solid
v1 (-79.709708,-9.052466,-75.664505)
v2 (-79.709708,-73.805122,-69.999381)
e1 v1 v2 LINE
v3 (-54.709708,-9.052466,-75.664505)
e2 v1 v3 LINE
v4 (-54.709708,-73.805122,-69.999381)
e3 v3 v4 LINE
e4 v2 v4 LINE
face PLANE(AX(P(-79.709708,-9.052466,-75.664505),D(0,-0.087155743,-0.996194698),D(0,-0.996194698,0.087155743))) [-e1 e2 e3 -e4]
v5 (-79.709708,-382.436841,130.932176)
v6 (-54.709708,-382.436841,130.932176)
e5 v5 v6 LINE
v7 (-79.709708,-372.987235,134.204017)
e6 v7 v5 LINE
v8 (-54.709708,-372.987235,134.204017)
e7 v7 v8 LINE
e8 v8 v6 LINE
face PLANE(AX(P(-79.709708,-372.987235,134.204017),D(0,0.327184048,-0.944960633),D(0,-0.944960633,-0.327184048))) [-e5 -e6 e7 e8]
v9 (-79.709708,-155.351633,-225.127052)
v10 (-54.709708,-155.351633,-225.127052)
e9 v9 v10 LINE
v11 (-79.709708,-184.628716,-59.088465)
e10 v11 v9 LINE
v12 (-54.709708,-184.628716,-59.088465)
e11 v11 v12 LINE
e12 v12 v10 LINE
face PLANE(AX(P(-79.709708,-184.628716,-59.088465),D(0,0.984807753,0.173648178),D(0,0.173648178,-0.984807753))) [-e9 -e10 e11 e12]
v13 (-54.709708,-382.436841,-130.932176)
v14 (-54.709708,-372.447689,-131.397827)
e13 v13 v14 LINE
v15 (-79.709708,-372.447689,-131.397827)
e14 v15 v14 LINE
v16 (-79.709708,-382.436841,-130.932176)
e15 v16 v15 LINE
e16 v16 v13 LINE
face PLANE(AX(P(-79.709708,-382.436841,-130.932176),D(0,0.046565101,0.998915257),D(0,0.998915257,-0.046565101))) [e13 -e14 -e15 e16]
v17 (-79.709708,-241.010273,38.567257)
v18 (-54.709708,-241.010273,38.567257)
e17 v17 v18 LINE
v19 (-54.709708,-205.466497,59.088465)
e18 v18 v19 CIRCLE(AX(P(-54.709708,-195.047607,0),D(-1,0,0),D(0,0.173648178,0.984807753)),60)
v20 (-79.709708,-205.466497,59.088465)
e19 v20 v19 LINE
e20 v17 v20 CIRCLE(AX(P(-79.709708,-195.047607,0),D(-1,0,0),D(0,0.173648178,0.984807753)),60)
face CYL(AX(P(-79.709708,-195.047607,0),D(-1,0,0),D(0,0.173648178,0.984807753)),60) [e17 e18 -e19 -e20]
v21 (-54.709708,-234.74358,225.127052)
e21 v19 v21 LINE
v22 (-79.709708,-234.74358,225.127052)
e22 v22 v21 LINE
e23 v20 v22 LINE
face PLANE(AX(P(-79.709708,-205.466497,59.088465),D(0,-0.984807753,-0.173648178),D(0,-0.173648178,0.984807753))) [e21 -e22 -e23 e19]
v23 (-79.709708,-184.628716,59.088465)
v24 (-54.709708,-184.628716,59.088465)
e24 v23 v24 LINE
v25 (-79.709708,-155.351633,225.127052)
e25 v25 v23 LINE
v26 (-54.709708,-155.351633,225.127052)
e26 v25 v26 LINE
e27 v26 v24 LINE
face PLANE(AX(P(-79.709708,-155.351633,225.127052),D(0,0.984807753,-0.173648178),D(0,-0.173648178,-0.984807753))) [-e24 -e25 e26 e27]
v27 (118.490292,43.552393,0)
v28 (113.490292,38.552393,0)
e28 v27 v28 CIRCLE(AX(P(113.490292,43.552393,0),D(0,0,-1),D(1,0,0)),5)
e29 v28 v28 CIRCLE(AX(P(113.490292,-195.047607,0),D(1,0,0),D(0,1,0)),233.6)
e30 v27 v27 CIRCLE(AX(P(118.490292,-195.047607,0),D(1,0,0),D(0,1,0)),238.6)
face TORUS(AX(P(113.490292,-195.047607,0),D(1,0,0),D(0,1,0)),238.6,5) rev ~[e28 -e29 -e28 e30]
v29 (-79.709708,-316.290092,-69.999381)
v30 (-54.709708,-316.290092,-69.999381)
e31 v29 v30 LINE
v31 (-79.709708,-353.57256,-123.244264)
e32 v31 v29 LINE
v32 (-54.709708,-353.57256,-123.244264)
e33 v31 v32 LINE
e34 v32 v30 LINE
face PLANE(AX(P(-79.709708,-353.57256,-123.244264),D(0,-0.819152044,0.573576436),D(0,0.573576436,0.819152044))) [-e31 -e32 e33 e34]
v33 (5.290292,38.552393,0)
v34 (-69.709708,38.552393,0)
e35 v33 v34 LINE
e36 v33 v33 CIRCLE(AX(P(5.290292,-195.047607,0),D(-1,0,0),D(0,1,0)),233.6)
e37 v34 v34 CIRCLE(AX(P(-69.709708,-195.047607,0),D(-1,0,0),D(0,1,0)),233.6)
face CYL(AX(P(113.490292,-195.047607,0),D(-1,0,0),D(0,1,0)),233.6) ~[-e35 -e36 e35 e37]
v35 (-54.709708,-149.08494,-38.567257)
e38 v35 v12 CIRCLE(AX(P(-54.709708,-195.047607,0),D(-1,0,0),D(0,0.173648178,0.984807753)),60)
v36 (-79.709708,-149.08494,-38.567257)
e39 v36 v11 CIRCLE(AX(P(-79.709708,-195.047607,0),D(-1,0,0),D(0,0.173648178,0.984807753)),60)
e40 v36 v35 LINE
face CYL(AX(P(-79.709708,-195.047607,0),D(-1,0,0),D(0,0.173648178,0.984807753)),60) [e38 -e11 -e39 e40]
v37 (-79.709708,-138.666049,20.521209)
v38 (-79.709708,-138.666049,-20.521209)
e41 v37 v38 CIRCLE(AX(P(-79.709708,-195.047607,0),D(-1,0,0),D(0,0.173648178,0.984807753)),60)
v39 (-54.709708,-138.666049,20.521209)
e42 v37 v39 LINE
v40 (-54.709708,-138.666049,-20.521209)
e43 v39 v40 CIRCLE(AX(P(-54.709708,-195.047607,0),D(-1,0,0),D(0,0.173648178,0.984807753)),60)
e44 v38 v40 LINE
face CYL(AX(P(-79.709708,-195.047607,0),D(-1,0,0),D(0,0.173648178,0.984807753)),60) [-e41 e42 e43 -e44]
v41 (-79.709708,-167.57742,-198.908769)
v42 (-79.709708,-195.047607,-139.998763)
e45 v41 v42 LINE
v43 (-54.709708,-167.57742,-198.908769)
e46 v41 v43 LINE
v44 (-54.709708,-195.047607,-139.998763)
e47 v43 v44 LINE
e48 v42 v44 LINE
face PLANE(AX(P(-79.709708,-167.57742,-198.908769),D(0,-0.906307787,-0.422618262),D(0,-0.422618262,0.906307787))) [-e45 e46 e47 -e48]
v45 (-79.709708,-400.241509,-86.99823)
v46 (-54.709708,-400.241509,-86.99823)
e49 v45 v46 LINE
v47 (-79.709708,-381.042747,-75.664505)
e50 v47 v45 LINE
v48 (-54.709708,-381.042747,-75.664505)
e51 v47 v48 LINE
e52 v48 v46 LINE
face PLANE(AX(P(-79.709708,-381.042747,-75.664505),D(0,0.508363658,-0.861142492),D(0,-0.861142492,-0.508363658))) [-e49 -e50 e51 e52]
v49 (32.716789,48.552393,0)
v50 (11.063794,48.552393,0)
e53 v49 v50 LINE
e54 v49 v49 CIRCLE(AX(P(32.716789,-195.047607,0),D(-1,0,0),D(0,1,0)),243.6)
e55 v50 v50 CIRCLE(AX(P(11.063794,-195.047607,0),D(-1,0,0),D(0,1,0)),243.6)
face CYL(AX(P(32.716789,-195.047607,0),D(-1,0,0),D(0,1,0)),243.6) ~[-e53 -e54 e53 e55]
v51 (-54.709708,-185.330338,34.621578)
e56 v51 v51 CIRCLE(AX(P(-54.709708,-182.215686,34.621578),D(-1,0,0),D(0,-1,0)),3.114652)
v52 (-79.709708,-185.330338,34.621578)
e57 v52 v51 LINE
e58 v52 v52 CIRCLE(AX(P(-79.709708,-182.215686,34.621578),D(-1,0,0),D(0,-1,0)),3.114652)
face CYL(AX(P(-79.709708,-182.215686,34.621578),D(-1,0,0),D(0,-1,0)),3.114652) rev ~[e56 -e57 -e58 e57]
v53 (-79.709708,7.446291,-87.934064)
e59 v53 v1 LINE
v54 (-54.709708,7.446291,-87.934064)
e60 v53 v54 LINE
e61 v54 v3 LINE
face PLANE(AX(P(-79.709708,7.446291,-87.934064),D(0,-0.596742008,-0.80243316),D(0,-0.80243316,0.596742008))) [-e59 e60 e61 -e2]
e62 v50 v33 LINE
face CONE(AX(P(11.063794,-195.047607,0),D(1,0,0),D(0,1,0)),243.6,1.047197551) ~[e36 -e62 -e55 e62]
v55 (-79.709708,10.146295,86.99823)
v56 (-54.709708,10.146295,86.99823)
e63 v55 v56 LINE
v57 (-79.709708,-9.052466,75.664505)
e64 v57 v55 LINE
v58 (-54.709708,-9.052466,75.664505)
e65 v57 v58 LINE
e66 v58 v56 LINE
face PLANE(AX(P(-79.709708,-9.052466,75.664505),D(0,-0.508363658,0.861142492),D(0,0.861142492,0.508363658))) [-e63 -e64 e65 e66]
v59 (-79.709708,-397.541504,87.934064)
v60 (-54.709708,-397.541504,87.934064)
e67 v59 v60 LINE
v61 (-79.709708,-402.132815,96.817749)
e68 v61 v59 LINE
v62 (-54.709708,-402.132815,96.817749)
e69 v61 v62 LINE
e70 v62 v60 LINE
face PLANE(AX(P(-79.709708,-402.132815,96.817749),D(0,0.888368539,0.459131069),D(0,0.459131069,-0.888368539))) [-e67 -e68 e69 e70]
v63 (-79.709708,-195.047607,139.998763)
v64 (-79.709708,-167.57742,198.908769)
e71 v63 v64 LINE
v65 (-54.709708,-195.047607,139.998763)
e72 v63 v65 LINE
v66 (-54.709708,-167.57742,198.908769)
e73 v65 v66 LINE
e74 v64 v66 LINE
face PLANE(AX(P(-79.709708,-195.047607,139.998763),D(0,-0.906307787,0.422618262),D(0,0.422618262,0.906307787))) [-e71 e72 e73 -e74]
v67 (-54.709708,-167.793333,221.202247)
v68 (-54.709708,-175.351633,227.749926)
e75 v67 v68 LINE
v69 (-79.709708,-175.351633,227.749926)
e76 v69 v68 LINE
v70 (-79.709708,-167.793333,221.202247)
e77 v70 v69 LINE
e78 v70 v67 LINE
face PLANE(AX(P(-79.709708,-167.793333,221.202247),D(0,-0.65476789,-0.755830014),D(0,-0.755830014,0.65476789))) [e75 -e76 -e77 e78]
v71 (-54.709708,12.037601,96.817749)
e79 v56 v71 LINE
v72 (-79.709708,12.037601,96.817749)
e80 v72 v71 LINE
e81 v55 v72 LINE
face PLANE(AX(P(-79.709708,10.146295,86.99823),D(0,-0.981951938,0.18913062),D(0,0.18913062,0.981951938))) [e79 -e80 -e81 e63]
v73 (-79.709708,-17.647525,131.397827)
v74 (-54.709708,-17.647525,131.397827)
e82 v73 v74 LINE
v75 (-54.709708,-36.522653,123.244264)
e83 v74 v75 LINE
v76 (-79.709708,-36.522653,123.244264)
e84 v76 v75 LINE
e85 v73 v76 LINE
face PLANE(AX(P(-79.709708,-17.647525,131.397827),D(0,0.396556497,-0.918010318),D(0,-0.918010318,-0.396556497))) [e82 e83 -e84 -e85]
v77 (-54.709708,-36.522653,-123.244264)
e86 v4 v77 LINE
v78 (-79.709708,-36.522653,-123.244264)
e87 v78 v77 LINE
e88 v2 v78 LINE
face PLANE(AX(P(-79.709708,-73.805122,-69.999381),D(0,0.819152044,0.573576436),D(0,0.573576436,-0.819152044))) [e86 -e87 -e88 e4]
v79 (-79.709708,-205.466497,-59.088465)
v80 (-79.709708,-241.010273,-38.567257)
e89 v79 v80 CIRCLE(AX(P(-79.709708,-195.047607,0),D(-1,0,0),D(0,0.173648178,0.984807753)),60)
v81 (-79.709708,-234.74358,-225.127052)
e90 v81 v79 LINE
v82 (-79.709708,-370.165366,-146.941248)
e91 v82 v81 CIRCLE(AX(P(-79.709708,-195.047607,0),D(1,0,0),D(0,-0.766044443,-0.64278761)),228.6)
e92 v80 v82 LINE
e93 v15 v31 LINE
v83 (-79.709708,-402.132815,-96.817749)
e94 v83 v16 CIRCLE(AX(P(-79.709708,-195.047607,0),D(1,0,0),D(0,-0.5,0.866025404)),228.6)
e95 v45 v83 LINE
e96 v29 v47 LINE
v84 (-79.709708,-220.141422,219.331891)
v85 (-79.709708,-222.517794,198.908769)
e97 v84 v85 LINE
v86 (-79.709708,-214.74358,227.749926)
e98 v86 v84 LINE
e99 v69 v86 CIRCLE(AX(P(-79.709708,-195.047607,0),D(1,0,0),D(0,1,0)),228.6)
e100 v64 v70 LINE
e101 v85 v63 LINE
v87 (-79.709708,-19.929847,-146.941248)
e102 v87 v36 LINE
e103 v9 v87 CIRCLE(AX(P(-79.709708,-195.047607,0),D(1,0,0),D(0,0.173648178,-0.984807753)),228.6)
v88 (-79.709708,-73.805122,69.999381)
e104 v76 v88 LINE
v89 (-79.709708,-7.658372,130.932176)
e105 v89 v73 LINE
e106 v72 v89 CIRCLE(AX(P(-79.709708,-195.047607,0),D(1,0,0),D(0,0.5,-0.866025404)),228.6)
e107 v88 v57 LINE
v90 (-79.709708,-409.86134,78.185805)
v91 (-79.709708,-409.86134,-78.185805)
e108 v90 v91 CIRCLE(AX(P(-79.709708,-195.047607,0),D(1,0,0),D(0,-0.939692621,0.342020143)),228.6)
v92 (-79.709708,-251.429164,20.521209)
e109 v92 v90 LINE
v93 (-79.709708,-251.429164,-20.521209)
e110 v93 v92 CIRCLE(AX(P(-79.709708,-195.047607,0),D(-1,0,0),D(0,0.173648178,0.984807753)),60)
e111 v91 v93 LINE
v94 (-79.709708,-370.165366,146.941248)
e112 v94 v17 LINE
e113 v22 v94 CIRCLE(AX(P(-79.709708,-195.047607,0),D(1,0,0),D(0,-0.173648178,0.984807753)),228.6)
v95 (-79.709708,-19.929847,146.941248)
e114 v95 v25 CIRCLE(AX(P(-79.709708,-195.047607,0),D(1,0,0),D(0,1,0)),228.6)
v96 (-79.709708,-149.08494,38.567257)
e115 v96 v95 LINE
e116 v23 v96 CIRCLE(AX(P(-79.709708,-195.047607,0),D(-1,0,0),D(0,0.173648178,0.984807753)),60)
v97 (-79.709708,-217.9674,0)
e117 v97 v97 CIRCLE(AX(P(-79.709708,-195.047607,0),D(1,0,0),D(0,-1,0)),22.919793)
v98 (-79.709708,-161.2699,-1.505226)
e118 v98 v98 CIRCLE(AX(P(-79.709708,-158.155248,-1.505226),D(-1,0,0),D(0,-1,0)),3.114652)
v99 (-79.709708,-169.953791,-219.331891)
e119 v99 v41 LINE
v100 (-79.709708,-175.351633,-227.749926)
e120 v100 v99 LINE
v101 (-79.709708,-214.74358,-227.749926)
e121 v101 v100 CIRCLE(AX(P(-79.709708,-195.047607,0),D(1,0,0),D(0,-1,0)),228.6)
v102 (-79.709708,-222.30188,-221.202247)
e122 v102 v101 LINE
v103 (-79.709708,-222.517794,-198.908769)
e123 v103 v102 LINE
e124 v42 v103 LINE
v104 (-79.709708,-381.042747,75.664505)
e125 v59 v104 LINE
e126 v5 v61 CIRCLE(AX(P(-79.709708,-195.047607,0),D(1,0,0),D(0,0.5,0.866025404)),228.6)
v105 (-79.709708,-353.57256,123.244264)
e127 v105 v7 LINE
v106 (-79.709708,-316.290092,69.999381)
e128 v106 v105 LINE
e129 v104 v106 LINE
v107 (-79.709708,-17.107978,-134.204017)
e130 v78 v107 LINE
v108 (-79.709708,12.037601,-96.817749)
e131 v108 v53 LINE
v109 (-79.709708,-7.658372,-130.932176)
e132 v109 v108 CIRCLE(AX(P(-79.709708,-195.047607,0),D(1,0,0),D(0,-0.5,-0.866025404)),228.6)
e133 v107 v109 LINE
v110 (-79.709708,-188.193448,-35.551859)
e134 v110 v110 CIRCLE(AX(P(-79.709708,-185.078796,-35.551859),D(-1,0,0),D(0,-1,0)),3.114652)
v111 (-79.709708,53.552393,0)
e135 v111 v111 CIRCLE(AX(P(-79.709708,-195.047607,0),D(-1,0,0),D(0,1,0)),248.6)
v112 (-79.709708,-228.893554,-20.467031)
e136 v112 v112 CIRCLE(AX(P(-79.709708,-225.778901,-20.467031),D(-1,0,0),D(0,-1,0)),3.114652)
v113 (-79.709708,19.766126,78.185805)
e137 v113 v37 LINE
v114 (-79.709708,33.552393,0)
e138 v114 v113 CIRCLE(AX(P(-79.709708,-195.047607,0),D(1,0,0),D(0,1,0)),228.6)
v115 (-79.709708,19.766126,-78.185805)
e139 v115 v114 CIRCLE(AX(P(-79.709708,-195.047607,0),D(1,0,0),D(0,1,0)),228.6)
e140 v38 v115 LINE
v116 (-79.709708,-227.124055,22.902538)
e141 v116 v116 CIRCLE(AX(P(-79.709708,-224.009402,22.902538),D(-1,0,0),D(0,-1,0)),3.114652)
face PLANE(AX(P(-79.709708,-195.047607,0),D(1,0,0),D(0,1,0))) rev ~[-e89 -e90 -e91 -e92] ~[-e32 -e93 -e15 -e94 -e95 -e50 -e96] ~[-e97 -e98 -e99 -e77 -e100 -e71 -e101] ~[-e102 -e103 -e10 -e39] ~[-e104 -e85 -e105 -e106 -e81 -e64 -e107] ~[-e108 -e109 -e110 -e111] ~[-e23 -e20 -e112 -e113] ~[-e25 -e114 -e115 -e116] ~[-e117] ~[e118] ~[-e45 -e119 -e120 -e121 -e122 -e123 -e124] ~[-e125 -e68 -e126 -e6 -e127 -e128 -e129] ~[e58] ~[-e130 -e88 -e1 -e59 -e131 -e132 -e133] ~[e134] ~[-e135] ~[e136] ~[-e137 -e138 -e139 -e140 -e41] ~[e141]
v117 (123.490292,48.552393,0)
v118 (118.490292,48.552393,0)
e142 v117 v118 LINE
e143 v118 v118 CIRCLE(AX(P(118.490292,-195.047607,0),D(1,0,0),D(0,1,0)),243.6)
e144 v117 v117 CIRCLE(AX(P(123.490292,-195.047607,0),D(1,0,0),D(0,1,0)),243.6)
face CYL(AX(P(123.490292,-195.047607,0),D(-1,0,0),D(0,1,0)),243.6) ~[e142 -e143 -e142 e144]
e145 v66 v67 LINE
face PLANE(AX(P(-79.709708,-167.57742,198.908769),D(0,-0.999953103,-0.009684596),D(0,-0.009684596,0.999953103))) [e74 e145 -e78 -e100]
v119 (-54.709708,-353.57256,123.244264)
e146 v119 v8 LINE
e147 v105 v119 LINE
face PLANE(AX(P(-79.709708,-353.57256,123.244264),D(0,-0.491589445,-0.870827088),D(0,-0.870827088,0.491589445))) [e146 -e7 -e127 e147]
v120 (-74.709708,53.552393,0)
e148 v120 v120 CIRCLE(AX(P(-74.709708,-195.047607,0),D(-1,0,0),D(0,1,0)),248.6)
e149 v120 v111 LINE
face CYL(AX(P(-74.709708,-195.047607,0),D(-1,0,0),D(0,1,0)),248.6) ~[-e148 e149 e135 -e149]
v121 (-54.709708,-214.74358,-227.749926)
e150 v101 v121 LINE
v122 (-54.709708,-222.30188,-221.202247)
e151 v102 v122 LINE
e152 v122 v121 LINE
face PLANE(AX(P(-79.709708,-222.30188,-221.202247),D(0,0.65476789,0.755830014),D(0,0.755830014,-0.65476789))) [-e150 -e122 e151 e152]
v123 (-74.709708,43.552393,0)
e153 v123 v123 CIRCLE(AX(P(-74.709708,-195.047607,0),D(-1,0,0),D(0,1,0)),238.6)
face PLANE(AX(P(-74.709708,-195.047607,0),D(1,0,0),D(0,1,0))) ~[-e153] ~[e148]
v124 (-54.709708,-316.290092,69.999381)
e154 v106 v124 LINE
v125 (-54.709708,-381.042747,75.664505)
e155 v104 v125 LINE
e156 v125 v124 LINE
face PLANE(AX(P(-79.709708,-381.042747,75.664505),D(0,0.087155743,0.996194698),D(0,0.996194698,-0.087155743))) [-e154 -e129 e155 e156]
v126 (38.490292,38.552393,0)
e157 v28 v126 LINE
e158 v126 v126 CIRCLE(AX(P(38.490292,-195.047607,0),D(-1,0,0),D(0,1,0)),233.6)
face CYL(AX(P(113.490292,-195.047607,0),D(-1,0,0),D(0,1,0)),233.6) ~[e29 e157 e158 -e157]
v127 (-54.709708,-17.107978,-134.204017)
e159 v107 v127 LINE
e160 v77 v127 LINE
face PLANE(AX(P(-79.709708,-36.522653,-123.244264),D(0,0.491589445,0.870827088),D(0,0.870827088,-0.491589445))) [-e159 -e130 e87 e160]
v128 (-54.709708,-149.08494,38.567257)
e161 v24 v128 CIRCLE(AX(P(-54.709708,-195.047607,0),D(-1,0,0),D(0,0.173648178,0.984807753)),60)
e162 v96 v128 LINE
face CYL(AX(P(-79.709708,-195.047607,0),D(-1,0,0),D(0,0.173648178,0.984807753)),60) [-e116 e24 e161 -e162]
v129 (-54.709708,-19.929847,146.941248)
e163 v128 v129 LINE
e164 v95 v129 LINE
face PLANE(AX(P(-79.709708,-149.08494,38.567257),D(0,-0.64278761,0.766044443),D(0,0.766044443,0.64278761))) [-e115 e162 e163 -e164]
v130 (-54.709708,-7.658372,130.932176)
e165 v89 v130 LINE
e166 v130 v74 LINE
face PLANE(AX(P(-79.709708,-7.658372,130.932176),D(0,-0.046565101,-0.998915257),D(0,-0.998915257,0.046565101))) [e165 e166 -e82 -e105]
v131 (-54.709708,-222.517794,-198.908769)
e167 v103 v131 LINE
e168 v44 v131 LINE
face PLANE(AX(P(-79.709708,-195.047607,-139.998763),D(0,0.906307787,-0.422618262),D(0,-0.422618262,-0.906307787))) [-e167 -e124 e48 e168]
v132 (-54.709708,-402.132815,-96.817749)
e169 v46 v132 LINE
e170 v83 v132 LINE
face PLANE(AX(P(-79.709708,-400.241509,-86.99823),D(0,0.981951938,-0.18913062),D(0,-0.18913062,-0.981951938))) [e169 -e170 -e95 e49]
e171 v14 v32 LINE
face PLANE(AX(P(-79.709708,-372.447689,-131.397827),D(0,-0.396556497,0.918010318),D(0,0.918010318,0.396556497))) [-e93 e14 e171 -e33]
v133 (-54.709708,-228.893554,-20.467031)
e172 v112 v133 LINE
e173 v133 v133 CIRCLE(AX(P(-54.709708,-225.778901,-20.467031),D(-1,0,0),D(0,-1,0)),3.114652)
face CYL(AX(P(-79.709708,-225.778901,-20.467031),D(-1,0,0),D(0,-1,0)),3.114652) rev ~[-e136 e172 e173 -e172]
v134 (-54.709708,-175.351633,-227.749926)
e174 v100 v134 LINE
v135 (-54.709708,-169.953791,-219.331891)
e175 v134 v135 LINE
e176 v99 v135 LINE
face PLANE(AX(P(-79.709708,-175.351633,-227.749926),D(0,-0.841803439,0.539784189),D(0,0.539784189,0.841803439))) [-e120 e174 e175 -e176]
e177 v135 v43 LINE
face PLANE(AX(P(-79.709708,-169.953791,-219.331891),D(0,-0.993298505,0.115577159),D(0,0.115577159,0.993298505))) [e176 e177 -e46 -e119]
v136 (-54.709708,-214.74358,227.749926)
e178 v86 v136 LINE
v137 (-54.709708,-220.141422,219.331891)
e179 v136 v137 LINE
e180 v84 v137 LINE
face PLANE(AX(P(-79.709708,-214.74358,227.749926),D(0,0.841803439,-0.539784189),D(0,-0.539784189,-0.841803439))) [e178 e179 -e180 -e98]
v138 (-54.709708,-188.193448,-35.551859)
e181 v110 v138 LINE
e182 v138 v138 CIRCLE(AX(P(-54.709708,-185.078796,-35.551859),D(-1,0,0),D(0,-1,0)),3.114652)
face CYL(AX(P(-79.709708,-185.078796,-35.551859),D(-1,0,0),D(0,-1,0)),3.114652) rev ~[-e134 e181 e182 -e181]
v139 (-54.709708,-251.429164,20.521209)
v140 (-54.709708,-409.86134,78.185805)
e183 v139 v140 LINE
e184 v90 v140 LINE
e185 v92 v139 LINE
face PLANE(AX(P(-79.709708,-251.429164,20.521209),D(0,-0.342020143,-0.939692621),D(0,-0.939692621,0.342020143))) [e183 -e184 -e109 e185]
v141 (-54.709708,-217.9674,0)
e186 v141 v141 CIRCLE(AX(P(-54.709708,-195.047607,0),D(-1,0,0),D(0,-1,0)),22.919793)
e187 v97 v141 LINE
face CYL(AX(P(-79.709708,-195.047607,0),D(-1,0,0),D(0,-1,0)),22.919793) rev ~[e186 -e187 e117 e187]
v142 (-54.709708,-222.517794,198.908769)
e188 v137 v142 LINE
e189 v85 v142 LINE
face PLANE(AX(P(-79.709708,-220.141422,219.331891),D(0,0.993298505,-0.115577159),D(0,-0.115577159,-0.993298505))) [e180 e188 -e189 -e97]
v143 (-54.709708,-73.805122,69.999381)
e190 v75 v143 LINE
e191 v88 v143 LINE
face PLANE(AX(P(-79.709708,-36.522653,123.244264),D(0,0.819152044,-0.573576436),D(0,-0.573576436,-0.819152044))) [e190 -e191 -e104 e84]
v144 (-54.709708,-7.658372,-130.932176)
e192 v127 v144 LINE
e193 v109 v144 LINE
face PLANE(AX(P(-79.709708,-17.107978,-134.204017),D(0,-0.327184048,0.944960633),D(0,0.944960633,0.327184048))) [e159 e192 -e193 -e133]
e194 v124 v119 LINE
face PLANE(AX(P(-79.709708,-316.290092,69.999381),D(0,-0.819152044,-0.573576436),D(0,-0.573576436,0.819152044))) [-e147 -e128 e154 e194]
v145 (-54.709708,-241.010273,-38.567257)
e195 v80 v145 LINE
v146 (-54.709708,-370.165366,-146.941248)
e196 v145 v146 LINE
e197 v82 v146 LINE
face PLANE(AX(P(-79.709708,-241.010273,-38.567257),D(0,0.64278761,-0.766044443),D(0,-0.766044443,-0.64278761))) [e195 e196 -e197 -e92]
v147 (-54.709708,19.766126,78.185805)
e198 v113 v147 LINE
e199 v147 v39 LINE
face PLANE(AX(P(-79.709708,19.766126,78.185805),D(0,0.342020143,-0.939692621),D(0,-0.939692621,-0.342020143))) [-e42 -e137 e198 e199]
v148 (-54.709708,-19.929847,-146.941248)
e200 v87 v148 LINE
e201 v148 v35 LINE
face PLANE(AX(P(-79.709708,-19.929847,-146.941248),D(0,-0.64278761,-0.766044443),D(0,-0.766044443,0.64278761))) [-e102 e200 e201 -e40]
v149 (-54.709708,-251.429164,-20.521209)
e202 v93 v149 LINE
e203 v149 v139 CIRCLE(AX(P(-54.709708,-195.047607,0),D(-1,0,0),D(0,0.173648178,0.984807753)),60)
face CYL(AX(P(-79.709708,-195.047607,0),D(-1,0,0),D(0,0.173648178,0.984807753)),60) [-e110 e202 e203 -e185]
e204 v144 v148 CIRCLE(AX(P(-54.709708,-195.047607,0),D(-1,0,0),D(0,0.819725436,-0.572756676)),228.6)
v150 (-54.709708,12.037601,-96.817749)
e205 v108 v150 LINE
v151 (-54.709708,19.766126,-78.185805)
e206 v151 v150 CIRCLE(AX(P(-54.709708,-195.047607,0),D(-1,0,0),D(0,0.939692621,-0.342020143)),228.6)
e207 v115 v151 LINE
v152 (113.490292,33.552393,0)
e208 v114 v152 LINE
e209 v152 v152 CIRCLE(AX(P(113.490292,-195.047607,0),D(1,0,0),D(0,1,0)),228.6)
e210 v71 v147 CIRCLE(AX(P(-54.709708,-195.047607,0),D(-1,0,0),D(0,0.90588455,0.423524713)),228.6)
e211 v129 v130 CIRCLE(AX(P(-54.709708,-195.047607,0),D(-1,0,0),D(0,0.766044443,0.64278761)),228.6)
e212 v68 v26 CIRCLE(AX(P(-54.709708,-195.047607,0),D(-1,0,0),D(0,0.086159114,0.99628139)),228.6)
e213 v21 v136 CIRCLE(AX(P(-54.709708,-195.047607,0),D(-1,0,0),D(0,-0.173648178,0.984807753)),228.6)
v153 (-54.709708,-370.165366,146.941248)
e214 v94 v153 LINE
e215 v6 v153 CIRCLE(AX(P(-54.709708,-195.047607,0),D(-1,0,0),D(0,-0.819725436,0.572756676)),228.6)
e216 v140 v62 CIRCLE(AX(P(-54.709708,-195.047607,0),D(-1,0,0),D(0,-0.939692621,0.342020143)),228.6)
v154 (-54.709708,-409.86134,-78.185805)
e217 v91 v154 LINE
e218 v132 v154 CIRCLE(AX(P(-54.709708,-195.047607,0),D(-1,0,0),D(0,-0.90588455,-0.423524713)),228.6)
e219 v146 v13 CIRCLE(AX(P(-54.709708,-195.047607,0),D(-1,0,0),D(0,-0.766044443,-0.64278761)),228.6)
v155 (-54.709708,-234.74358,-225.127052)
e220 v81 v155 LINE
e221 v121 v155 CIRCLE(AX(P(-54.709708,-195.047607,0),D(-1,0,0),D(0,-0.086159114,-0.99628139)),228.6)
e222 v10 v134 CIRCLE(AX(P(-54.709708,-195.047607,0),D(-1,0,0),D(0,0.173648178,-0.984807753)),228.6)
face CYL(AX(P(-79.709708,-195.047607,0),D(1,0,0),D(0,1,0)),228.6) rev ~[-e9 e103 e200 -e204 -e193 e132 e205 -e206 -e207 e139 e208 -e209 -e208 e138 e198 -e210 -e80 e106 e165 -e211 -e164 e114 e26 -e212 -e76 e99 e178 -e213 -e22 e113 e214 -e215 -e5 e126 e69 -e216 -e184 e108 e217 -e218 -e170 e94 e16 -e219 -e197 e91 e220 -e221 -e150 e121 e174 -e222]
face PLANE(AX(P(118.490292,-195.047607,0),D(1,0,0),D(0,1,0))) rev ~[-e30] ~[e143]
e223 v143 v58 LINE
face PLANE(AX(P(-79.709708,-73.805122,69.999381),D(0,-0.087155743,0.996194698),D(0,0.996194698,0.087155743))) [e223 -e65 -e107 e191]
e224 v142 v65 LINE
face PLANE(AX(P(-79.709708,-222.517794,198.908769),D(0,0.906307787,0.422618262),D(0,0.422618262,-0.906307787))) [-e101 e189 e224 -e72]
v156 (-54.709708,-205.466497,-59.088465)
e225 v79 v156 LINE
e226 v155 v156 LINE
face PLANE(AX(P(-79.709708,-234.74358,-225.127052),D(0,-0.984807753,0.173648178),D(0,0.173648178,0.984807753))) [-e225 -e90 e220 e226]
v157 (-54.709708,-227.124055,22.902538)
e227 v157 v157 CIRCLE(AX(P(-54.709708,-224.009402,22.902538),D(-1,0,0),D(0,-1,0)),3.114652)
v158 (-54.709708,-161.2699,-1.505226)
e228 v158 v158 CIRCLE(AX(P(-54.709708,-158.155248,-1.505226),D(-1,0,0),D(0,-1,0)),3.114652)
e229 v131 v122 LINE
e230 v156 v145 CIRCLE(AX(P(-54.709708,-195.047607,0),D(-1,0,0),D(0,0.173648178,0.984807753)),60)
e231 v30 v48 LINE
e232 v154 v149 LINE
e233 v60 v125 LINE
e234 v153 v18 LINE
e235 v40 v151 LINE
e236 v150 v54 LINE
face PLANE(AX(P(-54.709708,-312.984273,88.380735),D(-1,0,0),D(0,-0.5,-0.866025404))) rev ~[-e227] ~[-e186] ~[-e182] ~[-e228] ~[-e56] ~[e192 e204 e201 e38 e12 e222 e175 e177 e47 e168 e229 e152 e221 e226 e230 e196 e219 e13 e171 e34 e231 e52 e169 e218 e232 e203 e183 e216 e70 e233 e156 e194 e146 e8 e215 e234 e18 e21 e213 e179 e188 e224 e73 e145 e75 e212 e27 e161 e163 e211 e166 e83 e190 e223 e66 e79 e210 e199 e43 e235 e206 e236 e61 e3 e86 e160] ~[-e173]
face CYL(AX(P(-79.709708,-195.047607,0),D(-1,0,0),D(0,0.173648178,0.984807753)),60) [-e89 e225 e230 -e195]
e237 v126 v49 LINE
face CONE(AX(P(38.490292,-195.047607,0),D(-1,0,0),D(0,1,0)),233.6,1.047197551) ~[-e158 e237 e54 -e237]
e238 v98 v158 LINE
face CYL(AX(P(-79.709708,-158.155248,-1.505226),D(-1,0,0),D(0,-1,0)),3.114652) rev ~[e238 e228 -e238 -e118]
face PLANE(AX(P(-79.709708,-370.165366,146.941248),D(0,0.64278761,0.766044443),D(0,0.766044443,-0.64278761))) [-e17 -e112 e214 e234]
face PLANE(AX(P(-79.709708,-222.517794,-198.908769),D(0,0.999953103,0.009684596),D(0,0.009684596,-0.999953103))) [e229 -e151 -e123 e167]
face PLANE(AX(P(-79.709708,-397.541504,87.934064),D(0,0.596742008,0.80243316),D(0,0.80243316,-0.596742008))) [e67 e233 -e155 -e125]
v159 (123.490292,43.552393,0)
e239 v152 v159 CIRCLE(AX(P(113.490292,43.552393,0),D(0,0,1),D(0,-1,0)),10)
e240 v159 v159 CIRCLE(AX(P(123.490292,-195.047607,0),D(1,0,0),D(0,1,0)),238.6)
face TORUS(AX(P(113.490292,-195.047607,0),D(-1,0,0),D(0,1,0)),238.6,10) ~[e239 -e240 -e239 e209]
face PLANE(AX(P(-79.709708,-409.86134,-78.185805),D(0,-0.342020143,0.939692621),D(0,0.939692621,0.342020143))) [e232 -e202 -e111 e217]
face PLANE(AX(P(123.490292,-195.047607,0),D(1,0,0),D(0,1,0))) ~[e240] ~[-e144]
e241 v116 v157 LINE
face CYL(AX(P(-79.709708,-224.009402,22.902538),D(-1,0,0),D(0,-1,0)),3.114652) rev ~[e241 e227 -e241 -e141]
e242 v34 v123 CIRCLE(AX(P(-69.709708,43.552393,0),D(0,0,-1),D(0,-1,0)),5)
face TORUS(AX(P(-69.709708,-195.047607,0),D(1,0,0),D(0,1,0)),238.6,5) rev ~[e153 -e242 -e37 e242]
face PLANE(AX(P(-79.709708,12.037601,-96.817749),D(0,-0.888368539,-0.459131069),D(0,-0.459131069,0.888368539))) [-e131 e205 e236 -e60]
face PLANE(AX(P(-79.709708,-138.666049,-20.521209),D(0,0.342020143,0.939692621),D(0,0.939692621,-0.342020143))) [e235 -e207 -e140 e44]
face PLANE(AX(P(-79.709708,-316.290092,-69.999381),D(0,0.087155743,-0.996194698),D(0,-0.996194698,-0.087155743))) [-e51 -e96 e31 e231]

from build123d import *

# Parameters (mm, degrees)
F2_R     = 3.1146523594
F2_R_2   = 22.9197931693
F3_DEPTH = 25
F4_COUNT = 6
F5_DEPTH = 25


# Not quite as in the source:
# - a feature names something its author has since deleted; it is built from what else it names


with BuildPart() as f1:
    # F0 (on Top) → F1 (revolve)
    with BuildSketch(Plane.XY):
        with BuildLine():
            Line((-79.7097083151, 53.5523933172), (-79.7097083151, 33.5523933172))
            Line((-79.7097083151, 33.5523933172), (113.4902916849, 33.5523933172))
            ThreePointArc((113.4902916849, 33.5523933172), (120.5613594967, 36.4813255054), (123.4902916849, 43.5523933172))
            Line((123.4902916849, 43.5523933172), (123.4902916849, 48.5523933172))
            Line((123.4902916849, 48.5523933172), (118.4902916849, 48.5523933172))
            Line((118.4902916849, 48.5523933172), (118.4902916849, 43.5523933172))
            ThreePointArc((118.4902916849, 43.5523933172), (117.0258255908, 40.0168594113), (113.4902916849, 38.5523933172))
            Line((113.4902916849, 38.5523933172), (38.4902916849, 38.5523933172))
            Line((38.4902916849, 38.5523933172), (5.2902916849, 38.5523933172))
            Line((5.2902916849, 38.5523933172), (-69.7097083151, 38.5523933172))
            ThreePointArc((-69.7097083151, 38.5523933172), (-73.2452422211, 40.0168594113), (-74.7097083151, 43.5523933172))
            Line((-74.7097083151, 43.5523933172), (-74.7097083151, 53.5523933172))
            Line((-74.7097083151, 53.5523933172), (-79.7097083151, 53.5523933172))
        make_face()
        Polygon((11.0637943768, 48.5523933172), (5.2902916849, 38.5523933172), (38.4902916849, 38.5523933172), (32.716788993, 48.5523933172), align=None)
    revolve(axis=Axis((21.8902916849, -195.0476066828, 0), (1, 0, 0)))

    # F2 (on face) → F3 (join)
    with BuildSketch(Plane(origin=(-79.7097083151, 0, 0), x_dir=(0, -1, 0), z_dir=(-1, 0, 0))):
        with BuildLine():
            ThreePointArc((184.6287160228, 59.0884651807), (189.8182621179, 59.7716818855), (195.0476066828, 60))
            Line((195.0476066828, 60), (195.0476066828, 139.9987626345))
            Line((195.0476066828, 139.9987626345), (167.5774196696, 198.9087687919))
            Line((167.5774196696, 198.9087687919), (167.7933331286, 221.202246743))
            Line((167.7933331286, 221.202246743), (175.3516332681, 227.7499256449))
            ThreePointArc((175.3516332681, 227.7499256449), (165.3226894728, 226.6591919532), (155.3516332681, 225.1270523386))
            Line((155.3516332681, 225.1270523386), (184.6287160228, 59.0884651807))
        make_face()
        with BuildLine():
            Line((195.0476066828, 139.9987626345), (195.0476066828, 60))
            ThreePointArc((195.0476066828, 60), (200.2769512476, 59.7716818855), (205.4664973428, 59.0884651807))
            Line((205.4664973428, 59.0884651807), (234.7435800974, 225.1270523386))
            ThreePointArc((234.7435800974, 225.1270523386), (224.7725238927, 226.6591919532), (214.7435800974, 227.7499256449))
            Line((214.7435800974, 227.7499256449), (220.1414219841, 219.3318912564))
            Line((220.1414219841, 219.3318912564), (222.5177936959, 198.9087687919))
            Line((222.5177936959, 198.9087687919), (195.0476066828, 139.9987626345))
        make_face()
        with BuildLine():
            ThreePointArc((205.4664973428, 59.0884651807), (200.2769512476, 59.7716818855), (195.0476066828, 60))
            ThreePointArc((195.0476066828, 60), (189.8182621179, 59.7716818855), (184.6287160228, 59.0884651807))
            ThreePointArc((184.6287160228, 59.0884651807), (156.4803501016, -45.9626665871), (255.0476066828, 0))
            ThreePointArc((255.0476066828, 0), (241.0102732699, 38.5672565812), (205.4664973428, 59.0884651807))
        make_face()
        with Locations((158.1552479456, -1.5052259386)):
            Circle(F2_R, mode=Mode.SUBTRACT)
        with Locations((185.0787958079, -35.5518585739)):
            Circle(F2_R, mode=Mode.SUBTRACT)
        with Locations((195.0476066828, 0)):
            Circle(F2_R_2, mode=Mode.SUBTRACT)
        with Locations((225.7789014718, -20.4670310233)):
            Circle(F2_R, mode=Mode.SUBTRACT)
        with Locations((224.0094022556, 22.9025377527)):
            Circle(F2_R, mode=Mode.SUBTRACT)
        with Locations((182.215685933, 34.6215777831)):
            Circle(F2_R, mode=Mode.SUBTRACT)
    extrude(amount=-F3_DEPTH)

    # F4: F1 ×6 about axis
    f4_axis = Axis((21.8902916849, -195.0476066828, 0), (1, 0, 0))


with BuildPart() as f1_1:
    add(f1.part)
    for i in range(1, F4_COUNT):
        add(f1.part.rotate(f4_axis, i * 360 / F4_COUNT))

    # F2 (on face) → F5 (cut)
    with BuildSketch(Plane(origin=(-79.7097083151, 0, 0), x_dir=(0, -1, 0), z_dir=(-1, 0, 0))):
        with Locations((158.1552479456, -1.5052259386)):
            Circle(F2_R)
        with Locations((182.215685933, 34.6215777831)):
            Circle(F2_R)
        with Locations((224.0094022556, 22.9025377527)):
            Circle(F2_R)
        with Locations((225.7789014718, -20.4670310233)):
            Circle(F2_R)
        with Locations((185.0787958079, -35.5518585739)):
            Circle(F2_R)
        with Locations((195.0476066828, 0)):
            Circle(F2_R_2)
    extrude(amount=-F5_DEPTH, mode=Mode.SUBTRACT)


solid = f1_1.part
